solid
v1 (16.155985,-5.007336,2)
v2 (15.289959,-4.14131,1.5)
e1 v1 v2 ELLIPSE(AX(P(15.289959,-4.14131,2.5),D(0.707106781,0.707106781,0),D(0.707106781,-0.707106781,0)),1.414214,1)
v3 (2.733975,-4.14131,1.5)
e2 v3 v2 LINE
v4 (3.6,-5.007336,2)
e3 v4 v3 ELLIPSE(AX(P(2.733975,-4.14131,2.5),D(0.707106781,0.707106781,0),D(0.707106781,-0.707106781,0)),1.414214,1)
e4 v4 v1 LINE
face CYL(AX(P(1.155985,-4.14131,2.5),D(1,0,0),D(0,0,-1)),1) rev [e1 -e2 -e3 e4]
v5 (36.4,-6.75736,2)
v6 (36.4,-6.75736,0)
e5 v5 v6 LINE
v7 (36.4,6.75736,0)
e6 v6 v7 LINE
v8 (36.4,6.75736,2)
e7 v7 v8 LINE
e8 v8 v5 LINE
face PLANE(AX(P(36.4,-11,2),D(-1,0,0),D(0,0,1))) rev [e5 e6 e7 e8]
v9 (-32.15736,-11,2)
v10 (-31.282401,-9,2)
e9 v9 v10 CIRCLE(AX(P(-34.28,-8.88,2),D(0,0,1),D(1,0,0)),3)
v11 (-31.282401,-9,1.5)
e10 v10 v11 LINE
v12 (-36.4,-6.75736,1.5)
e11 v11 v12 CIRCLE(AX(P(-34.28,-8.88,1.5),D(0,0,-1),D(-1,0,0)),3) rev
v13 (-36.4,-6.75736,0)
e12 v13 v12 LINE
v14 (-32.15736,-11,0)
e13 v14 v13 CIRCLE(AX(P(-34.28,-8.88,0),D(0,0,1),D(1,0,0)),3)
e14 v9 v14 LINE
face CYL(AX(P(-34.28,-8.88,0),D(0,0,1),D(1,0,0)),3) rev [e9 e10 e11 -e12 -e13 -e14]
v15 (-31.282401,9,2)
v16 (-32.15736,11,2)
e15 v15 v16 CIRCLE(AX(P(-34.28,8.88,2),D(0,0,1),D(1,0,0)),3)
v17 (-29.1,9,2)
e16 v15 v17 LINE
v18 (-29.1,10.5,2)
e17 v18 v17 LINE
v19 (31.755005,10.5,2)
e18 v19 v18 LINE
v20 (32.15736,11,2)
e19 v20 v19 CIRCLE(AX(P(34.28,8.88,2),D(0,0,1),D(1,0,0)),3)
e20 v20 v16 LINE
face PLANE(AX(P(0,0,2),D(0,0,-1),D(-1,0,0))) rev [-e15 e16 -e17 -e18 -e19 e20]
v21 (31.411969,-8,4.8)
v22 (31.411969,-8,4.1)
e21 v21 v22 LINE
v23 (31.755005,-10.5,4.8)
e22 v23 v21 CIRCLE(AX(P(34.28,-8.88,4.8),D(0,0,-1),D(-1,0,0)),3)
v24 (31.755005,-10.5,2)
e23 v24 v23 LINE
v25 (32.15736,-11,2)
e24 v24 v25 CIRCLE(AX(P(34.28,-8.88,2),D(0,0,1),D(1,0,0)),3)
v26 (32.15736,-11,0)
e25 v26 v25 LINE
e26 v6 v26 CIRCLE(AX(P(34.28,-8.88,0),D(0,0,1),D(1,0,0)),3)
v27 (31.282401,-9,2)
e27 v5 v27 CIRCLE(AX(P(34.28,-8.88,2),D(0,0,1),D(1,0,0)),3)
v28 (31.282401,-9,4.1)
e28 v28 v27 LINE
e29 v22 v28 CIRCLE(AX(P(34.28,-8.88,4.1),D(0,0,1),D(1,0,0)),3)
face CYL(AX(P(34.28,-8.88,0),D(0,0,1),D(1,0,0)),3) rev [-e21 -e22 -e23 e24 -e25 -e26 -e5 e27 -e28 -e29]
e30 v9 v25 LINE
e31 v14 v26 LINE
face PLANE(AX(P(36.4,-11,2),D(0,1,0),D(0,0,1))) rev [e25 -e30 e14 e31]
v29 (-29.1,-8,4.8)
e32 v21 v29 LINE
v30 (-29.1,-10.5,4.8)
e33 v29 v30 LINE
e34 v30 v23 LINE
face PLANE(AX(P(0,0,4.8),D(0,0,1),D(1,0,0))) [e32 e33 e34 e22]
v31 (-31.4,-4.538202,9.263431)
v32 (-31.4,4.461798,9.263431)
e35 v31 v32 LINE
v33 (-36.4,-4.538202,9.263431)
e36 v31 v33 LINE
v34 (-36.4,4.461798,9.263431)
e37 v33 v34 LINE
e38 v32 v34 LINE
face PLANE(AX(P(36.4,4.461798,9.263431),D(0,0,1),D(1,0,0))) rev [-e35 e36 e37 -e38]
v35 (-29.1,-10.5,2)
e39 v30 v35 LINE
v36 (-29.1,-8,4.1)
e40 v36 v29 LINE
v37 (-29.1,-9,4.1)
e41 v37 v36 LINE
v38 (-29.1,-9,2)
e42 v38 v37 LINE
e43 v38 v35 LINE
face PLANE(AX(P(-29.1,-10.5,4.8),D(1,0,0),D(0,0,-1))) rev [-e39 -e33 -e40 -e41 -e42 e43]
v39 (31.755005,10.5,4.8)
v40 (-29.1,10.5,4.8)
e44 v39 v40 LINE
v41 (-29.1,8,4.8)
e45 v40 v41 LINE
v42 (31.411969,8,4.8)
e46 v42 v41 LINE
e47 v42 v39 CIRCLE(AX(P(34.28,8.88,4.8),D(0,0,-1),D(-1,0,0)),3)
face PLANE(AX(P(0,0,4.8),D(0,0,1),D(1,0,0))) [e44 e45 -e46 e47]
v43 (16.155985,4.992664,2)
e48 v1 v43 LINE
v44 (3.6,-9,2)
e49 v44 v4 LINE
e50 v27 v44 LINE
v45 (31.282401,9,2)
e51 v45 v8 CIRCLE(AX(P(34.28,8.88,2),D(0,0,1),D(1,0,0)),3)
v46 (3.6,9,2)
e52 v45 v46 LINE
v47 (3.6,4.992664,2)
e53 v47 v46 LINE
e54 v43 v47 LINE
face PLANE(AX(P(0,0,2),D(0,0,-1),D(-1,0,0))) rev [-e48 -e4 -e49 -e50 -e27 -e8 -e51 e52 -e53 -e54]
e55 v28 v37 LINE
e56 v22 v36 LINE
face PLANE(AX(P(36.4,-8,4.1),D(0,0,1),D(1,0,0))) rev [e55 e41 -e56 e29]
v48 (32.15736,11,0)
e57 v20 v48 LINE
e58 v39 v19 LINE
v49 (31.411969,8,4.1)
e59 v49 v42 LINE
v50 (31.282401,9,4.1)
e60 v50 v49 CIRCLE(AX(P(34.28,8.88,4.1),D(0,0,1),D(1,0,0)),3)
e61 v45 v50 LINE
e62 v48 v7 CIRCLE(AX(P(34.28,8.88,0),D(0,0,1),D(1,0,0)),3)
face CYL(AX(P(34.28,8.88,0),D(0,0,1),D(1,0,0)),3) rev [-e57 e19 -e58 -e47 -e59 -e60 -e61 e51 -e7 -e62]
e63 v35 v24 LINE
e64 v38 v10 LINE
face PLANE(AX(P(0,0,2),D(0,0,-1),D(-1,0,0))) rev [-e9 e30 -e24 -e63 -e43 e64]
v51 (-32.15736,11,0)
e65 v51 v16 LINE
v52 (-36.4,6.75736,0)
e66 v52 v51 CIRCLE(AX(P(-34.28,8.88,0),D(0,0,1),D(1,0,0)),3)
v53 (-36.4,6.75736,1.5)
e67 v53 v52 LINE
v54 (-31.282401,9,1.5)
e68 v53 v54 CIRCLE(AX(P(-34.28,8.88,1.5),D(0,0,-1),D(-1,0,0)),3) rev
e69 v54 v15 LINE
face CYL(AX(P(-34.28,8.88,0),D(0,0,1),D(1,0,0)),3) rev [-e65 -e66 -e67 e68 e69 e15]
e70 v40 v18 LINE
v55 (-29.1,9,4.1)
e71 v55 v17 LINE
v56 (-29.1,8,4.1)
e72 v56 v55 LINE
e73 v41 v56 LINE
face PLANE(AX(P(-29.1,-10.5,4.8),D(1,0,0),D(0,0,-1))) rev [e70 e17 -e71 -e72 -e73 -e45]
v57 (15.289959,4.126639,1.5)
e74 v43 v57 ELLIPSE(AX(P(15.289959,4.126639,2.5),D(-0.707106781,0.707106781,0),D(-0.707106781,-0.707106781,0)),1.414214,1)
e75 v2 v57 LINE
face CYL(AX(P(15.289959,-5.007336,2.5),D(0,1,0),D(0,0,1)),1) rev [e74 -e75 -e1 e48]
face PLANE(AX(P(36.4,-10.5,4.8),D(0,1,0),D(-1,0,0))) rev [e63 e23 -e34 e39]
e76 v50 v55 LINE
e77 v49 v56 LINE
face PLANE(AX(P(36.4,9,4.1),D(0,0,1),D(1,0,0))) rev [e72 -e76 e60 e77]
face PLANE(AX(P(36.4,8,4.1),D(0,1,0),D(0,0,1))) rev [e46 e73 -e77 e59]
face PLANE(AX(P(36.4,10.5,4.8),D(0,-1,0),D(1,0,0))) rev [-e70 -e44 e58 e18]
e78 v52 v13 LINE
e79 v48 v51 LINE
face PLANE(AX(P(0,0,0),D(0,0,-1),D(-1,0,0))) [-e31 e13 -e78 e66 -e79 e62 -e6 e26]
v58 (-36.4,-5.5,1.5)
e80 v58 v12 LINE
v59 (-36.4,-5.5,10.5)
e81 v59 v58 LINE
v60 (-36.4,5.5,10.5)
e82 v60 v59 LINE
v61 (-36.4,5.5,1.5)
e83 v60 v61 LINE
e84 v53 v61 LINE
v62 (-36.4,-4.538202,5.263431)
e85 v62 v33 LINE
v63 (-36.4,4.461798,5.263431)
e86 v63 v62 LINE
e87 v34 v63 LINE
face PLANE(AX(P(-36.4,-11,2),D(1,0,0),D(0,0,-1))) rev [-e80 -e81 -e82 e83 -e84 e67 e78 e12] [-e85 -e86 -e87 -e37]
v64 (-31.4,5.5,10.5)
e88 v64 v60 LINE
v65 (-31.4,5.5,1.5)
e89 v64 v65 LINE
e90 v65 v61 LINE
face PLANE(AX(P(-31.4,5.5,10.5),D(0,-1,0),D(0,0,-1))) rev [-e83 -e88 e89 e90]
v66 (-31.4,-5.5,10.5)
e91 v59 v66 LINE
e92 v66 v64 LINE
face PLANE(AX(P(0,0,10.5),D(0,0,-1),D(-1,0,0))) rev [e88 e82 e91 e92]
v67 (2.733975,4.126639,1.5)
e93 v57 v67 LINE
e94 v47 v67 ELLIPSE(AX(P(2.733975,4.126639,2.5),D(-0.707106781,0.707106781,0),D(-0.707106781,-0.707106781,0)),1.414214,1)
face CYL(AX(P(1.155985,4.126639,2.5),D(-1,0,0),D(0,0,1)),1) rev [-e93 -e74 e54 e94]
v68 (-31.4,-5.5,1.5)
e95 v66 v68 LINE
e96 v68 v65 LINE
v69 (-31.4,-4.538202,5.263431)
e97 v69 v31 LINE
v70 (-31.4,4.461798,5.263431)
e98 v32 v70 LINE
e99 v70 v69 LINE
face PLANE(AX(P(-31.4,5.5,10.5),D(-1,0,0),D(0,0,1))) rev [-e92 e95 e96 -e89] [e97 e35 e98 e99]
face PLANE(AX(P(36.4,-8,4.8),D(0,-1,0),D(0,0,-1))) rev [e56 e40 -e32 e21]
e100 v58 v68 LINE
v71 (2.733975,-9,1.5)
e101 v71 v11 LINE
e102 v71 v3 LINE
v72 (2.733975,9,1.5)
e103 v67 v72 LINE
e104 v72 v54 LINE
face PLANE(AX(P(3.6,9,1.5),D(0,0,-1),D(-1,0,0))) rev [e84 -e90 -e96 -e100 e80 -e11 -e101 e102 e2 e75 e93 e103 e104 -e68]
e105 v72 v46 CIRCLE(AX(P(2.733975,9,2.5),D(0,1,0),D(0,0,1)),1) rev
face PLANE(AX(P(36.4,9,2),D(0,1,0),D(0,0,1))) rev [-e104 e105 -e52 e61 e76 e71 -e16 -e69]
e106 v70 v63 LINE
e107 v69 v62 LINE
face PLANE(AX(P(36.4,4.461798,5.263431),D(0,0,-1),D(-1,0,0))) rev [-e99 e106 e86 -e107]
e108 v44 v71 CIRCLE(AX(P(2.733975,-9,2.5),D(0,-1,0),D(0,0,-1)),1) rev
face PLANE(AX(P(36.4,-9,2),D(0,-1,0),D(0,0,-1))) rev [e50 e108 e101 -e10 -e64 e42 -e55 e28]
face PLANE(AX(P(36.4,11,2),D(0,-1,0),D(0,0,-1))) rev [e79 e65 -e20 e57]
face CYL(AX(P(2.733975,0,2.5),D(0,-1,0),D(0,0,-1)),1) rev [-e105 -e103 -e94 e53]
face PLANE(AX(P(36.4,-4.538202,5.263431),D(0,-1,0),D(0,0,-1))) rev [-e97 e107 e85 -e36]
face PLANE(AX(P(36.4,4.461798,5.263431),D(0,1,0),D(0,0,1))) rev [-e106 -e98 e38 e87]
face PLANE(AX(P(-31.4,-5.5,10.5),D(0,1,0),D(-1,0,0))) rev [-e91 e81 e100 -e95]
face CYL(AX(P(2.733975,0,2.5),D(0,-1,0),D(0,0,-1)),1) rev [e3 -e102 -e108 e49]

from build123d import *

# Parameters (mm, degrees)
SKIZZE1_W                       = 22
SKIZZE1_H                       = 72.8
AUFSATZ_LINEAR_AUSTRAGEN1_DEPTH = 2
SKIZZE2_R                       = 3
SCHNITT_LINEAR_AUSTRAGEN1_DEPTH = 2
SKIZZE3_W                       = 65.5
SKIZZE3_H                       = 21
AUFSATZ_LINEAR_AUSTRAGEN2_DEPTH = 2.8
SCHNITT_LINEAR_AUSTRAGEN2_DEPTH = 67.590464783
SKIZZE5_R                       = 3
SCHNITT_LINEAR_AUSTRAGEN4_DEPTH = 39.128729326
SKIZZE6_W                       = 18
SKIZZE6_H                       = 1
SCHNITT_LINEAR_AUSTRAGEN5_DEPTH = 40
SKIZZE8_W                       = 15
SKIZZE8_H                       = 10
SCHNITT_LINEAR_AUSTRAGEN6_DEPTH = 0.5
VERRUNDUNG3_R                   = 1
SKIZZE9_W                       = 5
SKIZZE9_H                       = 11
AUFSATZ_LINEAR_AUSTRAGEN3_DEPTH = 9
SKIZZE10_W                      = 9
SKIZZE10_H                      = 4
SCHNITT_LINEAR_AUSTRAGEN7_DEPTH = 75.371298227


with BuildPart() as part:
    # Skizze1 → Aufsatz-Linear austragen1 (new body)
    with BuildSketch(Plane(origin=(0, 0, 0), x_dir=(0, 1, 0), z_dir=(0, 0, 1))):
        Rectangle(SKIZZE1_W, SKIZZE1_H)
    extrude(amount=AUFSATZ_LINEAR_AUSTRAGEN1_DEPTH)

    # Skizze2 → Schnitt-Linear austragen1 (cut)
    with BuildSketch(Plane.XY.offset(2)):
        with Locations((-34.28, 8.88)):
            Circle(SKIZZE2_R)
        with Locations((-34.28, -8.88)):
            Circle(SKIZZE2_R)
        with Locations((34.28, -8.88)):
            Circle(SKIZZE2_R)
        with Locations((34.28, 8.88)):
            Circle(SKIZZE2_R)
    extrude(amount=-SCHNITT_LINEAR_AUSTRAGEN1_DEPTH, mode=Mode.SUBTRACT)

    # Skizze3 → Aufsatz-Linear austragen2 (add)
    with BuildSketch(Plane.XY.offset(2)):
        with Locations((3.65, 0)):
            Rectangle(SKIZZE3_W, SKIZZE3_H)
    extrude(amount=AUFSATZ_LINEAR_AUSTRAGEN2_DEPTH)

    # Skizze4 → Schnitt-Linear austragen2 (cut, through all)
    with BuildSketch(Plane(origin=(-29.1, 0, 0), x_dir=(0, -1, 0), z_dir=(-1, 0, 0))):
        Polygon((-8, 4.8), (8, 4.8), (8, 4.1), (9, 4.1), (9, 2), (-9, 2), (-9, 4.1), (-8, 4.1), align=None)
    extrude(amount=-SCHNITT_LINEAR_AUSTRAGEN2_DEPTH, mode=Mode.SUBTRACT)

    # Skizze5 → Schnitt-Linear austragen4 (cut, through all)
    with BuildSketch(Plane(origin=(0, 0, 2), x_dir=(1, 0, 0), z_dir=(0, 0, -1))):
        with Locations((34.28, -8.88)):
            Circle(SKIZZE5_R)
        with Locations((34.28, 8.88)):
            Circle(SKIZZE5_R)
    extrude(amount=-SCHNITT_LINEAR_AUSTRAGEN4_DEPTH, mode=Mode.SUBTRACT)

    # Skizze6 → Schnitt-Linear austragen5 (cut)
    with BuildSketch(Plane(origin=(-36.4, 0, 0), x_dir=(0, -1, 0), z_dir=(-1, 0, 0))):
        with Locations((0, 2)):
            Rectangle(SKIZZE6_W, SKIZZE6_H)
    extrude(amount=-SCHNITT_LINEAR_AUSTRAGEN5_DEPTH, mode=Mode.SUBTRACT)

    # Skizze8 → Schnitt-Linear austragen6 (cut)
    with BuildSketch(Plane.XY.offset(2)):
        with Locations((8.655984658, -0.007335612)):
            Rectangle(SKIZZE8_W, SKIZZE8_H)
    extrude(amount=-SCHNITT_LINEAR_AUSTRAGEN6_DEPTH, mode=Mode.SUBTRACT)

    # Verrundung3
    # the kernel refuses this fillet: 1 mm, written as the material it adds along each edge
    with BuildSketch(Plane(origin=(3.6, -9, 1.5), x_dir=(0, 0, 1), z_dir=(0, 1, 0))) as verrundung3_piece_1:
        with BuildLine():
            CenterArc((1, -0.866025404), VERRUNDUNG3_R, 120, 60)
            Line((0, -0.866025404), (-0.02, -0.866025404))
            Line((-0.02, -0.866025404), (-0.02, 0))
            Line((-0.02, 0), (0, 0.02))
            ThreePointArc((0, 0.02), (0.25, 0.02), (0.49, 0.017320508))
            Line((0.49, 0.017320508), (0.5, 0))
        make_face()
    extrude(amount=3.992664388)
    with BuildSketch(Plane(origin=(3.6, -5.007335612, 1.5), x_dir=(0, 0, 1), z_dir=(1, 0, 0)), Plane(origin=(16.155984658, 4.992664388, 1.5), x_dir=(0, 0, 1), z_dir=(-1, 0, 0))) as verrundung3_piece_2:
        with BuildLine():
            CenterArc((1, -0.866025404), VERRUNDUNG3_R, 120, 60)
            Line((0, -0.866025404), (-0.02, -0.866025404))
            Line((-0.02, -0.866025404), (-0.02, 0))
            Line((-0.02, 0), (0, 0.02))
            ThreePointArc((0, 0.02), (0.25, 0.02), (0.49, 0.017320508))
            Line((0.49, 0.017320508), (0.5, 0))
        make_face()
    extrude(amount=12.555984658)
    with BuildSketch(Plane(origin=(3.6, 4.992664388, 1.5), x_dir=(0, 0, 1), z_dir=(0, 1, 0))) as verrundung3_piece_3:
        with BuildLine():
            CenterArc((1, -0.866025404), VERRUNDUNG3_R, 120, 60)
            Line((0, -0.866025404), (-0.02, -0.866025404))
            Line((-0.02, -0.866025404), (-0.02, 0))
            Line((-0.02, 0), (0, 0.02))
            ThreePointArc((0, 0.02), (0.25, 0.02), (0.49, 0.017320508))
            Line((0.49, 0.017320508), (0.5, 0))
        make_face()
    extrude(amount=4.007335612)
    with BuildSketch(Plane(origin=(16.155984658, -5.007335612, 1.5), x_dir=(0, 0, 1), z_dir=(0, 1, 0))) as verrundung3_piece_4:
        with BuildLine():
            CenterArc((1, -0.866025404), VERRUNDUNG3_R, 120, 60)
            Line((0, -0.866025404), (-0.02, -0.866025404))
            Line((-0.02, -0.866025404), (-0.02, 0))
            Line((-0.02, 0), (0, 0.02))
            ThreePointArc((0, 0.02), (0.25, 0.02), (0.49, 0.017320508))
            Line((0.49, 0.017320508), (0.5, 0))
        make_face()
    extrude(amount=10)
    with BuildSketch(Plane(origin=(3.6, -9, 1.5), x_dir=(0, 0, 1), z_dir=(0, 1, 0))) as verrundung3_piece_5a_section:
        with BuildLine():
            CenterArc((1, -0.866025404), VERRUNDUNG3_R, 120, 60)
            Line((0, -0.866025404), (-0.02, -0.866025404))
            Line((-0.02, -0.866025404), (-0.02, 0))
            Line((-0.02, 0), (0, 0.02))
            ThreePointArc((0, 0.02), (0.25, 0.02), (0.49, 0.017320508))
            Line((0.49, 0.017320508), (0.5, 0))
        make_face()
    verrundung3_piece_5a = extrude(amount=6.157727897, mode=Mode.PRIVATE)
    verrundung3_piece_5a = split(verrundung3_piece_5a, bisect_by=Plane(origin=(3.383689554, -5.007335612, 1.629516711), z_dir=(0, 1, 0)), keep=Keep.TOP, mode=Mode.PRIVATE)
    with BuildSketch(Plane(origin=(1.434936491, -5.007335612, 1.5), x_dir=(0, 0, 1), z_dir=(1, 0, 0))) as verrundung3_piece_5b_section:
        with BuildLine():
            CenterArc((1, -0.866025404), VERRUNDUNG3_R, 120, 60)
            Line((0, -0.866025404), (-0.02, -0.866025404))
            Line((-0.02, -0.866025404), (-0.02, 0))
            Line((-0.02, 0), (0, 0.02))
            ThreePointArc((0, 0.02), (0.25, 0.02), (0.49, 0.017320508))
            Line((0.49, 0.017320508), (0.5, 0))
        make_face()
    verrundung3_piece_5b = extrude(amount=14.721048168, mode=Mode.PRIVATE)
    verrundung3_piece_5b = split(verrundung3_piece_5b, bisect_by=Plane(origin=(3.6, -4.791025166, 1.629516711), z_dir=(-1, 0, 0)), keep=Keep.TOP, mode=Mode.PRIVATE)
    verrundung3_piece_5 = verrundung3_piece_5a & verrundung3_piece_5b
    add(verrundung3_piece_5)
    with BuildSketch(Plane(origin=(3.6, -5.007335612, 1.5), x_dir=(0, 0, 1), z_dir=(1, 0, 0))) as verrundung3_piece_6a_section:
        with BuildLine():
            CenterArc((1, -0.866025404), VERRUNDUNG3_R, 120, 60)
            Line((0, -0.866025404), (-0.02, -0.866025404))
            Line((-0.02, -0.866025404), (-0.02, 0))
            Line((-0.02, 0), (0, 0.02))
            ThreePointArc((0, 0.02), (0.25, 0.02), (0.49, 0.017320508))
            Line((0.49, 0.017320508), (0.5, 0))
        make_face()
    verrundung3_piece_6a = extrude(amount=14.721048168, mode=Mode.PRIVATE)
    verrundung3_piece_6a = split(verrundung3_piece_6a, bisect_by=Plane(origin=(16.155984658, -4.791025166, 1.629516711), z_dir=(1, 0, 0)), keep=Keep.TOP, mode=Mode.PRIVATE)
    with BuildSketch(Plane(origin=(16.155984658, -7.172399122, 1.5), x_dir=(0, 0, 1), z_dir=(0, 1, 0))) as verrundung3_piece_6b_section:
        with BuildLine():
            CenterArc((1, -0.866025404), VERRUNDUNG3_R, 120, 60)
            Line((0, -0.866025404), (-0.02, -0.866025404))
            Line((-0.02, -0.866025404), (-0.02, 0))
            Line((-0.02, 0), (0, 0.02))
            ThreePointArc((0, 0.02), (0.25, 0.02), (0.49, 0.017320508))
            Line((0.49, 0.017320508), (0.5, 0))
        make_face()
    verrundung3_piece_6b = extrude(amount=12.165063509, mode=Mode.PRIVATE)
    verrundung3_piece_6b = split(verrundung3_piece_6b, bisect_by=Plane(origin=(15.939674213, -5.007335612, 1.629516711), z_dir=(0, -1, 0)), keep=Keep.TOP, mode=Mode.PRIVATE)
    verrundung3_piece_6 = verrundung3_piece_6a & verrundung3_piece_6b
    add(verrundung3_piece_6)
    with BuildSketch(Plane(origin=(16.155984658, 4.992664388, 1.5), x_dir=(0, 0, 1), z_dir=(-1, 0, 0))) as verrundung3_piece_7a_section:
        with BuildLine():
            CenterArc((1, -0.866025404), VERRUNDUNG3_R, 120, 60)
            Line((0, -0.866025404), (-0.02, -0.866025404))
            Line((-0.02, -0.866025404), (-0.02, 0))
            Line((-0.02, 0), (0, 0.02))
            ThreePointArc((0, 0.02), (0.25, 0.02), (0.49, 0.017320508))
            Line((0.49, 0.017320508), (0.5, 0))
        make_face()
    verrundung3_piece_7a = extrude(amount=14.721048168, mode=Mode.PRIVATE)
    verrundung3_piece_7a = split(verrundung3_piece_7a, bisect_by=Plane(origin=(3.6, 4.776353942, 1.629516711), z_dir=(-1, 0, 0)), keep=Keep.TOP, mode=Mode.PRIVATE)
    with BuildSketch(Plane(origin=(3.6, 2.827600878, 1.5), x_dir=(0, 0, 1), z_dir=(0, 1, 0))) as verrundung3_piece_7b_section:
        with BuildLine():
            CenterArc((1, -0.866025404), VERRUNDUNG3_R, 120, 60)
            Line((0, -0.866025404), (-0.02, -0.866025404))
            Line((-0.02, -0.866025404), (-0.02, 0))
            Line((-0.02, 0), (0, 0.02))
            ThreePointArc((0, 0.02), (0.25, 0.02), (0.49, 0.017320508))
            Line((0.49, 0.017320508), (0.5, 0))
        make_face()
    verrundung3_piece_7b = extrude(amount=6.172399122, mode=Mode.PRIVATE)
    verrundung3_piece_7b = split(verrundung3_piece_7b, bisect_by=Plane(origin=(3.383689554, 4.992664388, 1.629516711), z_dir=(0, -1, 0)), keep=Keep.TOP, mode=Mode.PRIVATE)
    verrundung3_piece_7 = verrundung3_piece_7a & verrundung3_piece_7b
    add(verrundung3_piece_7)
    with BuildSketch(Plane(origin=(16.155984658, -5.007335612, 1.5), x_dir=(0, 0, 1), z_dir=(0, 1, 0))) as verrundung3_piece_8a_section:
        with BuildLine():
            CenterArc((1, -0.866025404), VERRUNDUNG3_R, 120, 60)
            Line((0, -0.866025404), (-0.02, -0.866025404))
            Line((-0.02, -0.866025404), (-0.02, 0))
            Line((-0.02, 0), (0, 0.02))
            ThreePointArc((0, 0.02), (0.25, 0.02), (0.49, 0.017320508))
            Line((0.49, 0.017320508), (0.5, 0))
        make_face()
    verrundung3_piece_8a = extrude(amount=12.165063509, mode=Mode.PRIVATE)
    verrundung3_piece_8a = split(verrundung3_piece_8a, bisect_by=Plane(origin=(15.939674213, 4.992664388, 1.629516711), z_dir=(0, 1, 0)), keep=Keep.TOP, mode=Mode.PRIVATE)
    with BuildSketch(Plane(origin=(18.321048168, 4.992664388, 1.5), x_dir=(0, 0, 1), z_dir=(-1, 0, 0))) as verrundung3_piece_8b_section:
        with BuildLine():
            CenterArc((1, -0.866025404), VERRUNDUNG3_R, 120, 60)
            Line((0, -0.866025404), (-0.02, -0.866025404))
            Line((-0.02, -0.866025404), (-0.02, 0))
            Line((-0.02, 0), (0, 0.02))
            ThreePointArc((0, 0.02), (0.25, 0.02), (0.49, 0.017320508))
            Line((0.49, 0.017320508), (0.5, 0))
        make_face()
    verrundung3_piece_8b = extrude(amount=14.721048168, mode=Mode.PRIVATE)
    verrundung3_piece_8b = split(verrundung3_piece_8b, bisect_by=Plane(origin=(16.155984658, 4.776353942, 1.629516711), z_dir=(1, 0, 0)), keep=Keep.TOP, mode=Mode.PRIVATE)
    verrundung3_piece_8 = verrundung3_piece_8a & verrundung3_piece_8b
    add(verrundung3_piece_8)

    # Skizze9 → Aufsatz-Linear austragen3 (add)
    with BuildSketch(Plane.XY.offset(1.5)):
        with Locations((-33.9, 0)):
            Rectangle(SKIZZE9_W, SKIZZE9_H)
    extrude(amount=AUFSATZ_LINEAR_AUSTRAGEN3_DEPTH)

    # Skizze10 → Schnitt-Linear austragen7 (cut, through all)
    with BuildSketch(Plane(origin=(-36.4, 0, 0), x_dir=(0, -1, 0), z_dir=(-1, 0, 0))):
        with Locations((0.038201858, 7.263431172)):
            Rectangle(SKIZZE10_W, SKIZZE10_H)
    extrude(amount=-SCHNITT_LINEAR_AUSTRAGEN7_DEPTH, mode=Mode.SUBTRACT)


solid = part.part
